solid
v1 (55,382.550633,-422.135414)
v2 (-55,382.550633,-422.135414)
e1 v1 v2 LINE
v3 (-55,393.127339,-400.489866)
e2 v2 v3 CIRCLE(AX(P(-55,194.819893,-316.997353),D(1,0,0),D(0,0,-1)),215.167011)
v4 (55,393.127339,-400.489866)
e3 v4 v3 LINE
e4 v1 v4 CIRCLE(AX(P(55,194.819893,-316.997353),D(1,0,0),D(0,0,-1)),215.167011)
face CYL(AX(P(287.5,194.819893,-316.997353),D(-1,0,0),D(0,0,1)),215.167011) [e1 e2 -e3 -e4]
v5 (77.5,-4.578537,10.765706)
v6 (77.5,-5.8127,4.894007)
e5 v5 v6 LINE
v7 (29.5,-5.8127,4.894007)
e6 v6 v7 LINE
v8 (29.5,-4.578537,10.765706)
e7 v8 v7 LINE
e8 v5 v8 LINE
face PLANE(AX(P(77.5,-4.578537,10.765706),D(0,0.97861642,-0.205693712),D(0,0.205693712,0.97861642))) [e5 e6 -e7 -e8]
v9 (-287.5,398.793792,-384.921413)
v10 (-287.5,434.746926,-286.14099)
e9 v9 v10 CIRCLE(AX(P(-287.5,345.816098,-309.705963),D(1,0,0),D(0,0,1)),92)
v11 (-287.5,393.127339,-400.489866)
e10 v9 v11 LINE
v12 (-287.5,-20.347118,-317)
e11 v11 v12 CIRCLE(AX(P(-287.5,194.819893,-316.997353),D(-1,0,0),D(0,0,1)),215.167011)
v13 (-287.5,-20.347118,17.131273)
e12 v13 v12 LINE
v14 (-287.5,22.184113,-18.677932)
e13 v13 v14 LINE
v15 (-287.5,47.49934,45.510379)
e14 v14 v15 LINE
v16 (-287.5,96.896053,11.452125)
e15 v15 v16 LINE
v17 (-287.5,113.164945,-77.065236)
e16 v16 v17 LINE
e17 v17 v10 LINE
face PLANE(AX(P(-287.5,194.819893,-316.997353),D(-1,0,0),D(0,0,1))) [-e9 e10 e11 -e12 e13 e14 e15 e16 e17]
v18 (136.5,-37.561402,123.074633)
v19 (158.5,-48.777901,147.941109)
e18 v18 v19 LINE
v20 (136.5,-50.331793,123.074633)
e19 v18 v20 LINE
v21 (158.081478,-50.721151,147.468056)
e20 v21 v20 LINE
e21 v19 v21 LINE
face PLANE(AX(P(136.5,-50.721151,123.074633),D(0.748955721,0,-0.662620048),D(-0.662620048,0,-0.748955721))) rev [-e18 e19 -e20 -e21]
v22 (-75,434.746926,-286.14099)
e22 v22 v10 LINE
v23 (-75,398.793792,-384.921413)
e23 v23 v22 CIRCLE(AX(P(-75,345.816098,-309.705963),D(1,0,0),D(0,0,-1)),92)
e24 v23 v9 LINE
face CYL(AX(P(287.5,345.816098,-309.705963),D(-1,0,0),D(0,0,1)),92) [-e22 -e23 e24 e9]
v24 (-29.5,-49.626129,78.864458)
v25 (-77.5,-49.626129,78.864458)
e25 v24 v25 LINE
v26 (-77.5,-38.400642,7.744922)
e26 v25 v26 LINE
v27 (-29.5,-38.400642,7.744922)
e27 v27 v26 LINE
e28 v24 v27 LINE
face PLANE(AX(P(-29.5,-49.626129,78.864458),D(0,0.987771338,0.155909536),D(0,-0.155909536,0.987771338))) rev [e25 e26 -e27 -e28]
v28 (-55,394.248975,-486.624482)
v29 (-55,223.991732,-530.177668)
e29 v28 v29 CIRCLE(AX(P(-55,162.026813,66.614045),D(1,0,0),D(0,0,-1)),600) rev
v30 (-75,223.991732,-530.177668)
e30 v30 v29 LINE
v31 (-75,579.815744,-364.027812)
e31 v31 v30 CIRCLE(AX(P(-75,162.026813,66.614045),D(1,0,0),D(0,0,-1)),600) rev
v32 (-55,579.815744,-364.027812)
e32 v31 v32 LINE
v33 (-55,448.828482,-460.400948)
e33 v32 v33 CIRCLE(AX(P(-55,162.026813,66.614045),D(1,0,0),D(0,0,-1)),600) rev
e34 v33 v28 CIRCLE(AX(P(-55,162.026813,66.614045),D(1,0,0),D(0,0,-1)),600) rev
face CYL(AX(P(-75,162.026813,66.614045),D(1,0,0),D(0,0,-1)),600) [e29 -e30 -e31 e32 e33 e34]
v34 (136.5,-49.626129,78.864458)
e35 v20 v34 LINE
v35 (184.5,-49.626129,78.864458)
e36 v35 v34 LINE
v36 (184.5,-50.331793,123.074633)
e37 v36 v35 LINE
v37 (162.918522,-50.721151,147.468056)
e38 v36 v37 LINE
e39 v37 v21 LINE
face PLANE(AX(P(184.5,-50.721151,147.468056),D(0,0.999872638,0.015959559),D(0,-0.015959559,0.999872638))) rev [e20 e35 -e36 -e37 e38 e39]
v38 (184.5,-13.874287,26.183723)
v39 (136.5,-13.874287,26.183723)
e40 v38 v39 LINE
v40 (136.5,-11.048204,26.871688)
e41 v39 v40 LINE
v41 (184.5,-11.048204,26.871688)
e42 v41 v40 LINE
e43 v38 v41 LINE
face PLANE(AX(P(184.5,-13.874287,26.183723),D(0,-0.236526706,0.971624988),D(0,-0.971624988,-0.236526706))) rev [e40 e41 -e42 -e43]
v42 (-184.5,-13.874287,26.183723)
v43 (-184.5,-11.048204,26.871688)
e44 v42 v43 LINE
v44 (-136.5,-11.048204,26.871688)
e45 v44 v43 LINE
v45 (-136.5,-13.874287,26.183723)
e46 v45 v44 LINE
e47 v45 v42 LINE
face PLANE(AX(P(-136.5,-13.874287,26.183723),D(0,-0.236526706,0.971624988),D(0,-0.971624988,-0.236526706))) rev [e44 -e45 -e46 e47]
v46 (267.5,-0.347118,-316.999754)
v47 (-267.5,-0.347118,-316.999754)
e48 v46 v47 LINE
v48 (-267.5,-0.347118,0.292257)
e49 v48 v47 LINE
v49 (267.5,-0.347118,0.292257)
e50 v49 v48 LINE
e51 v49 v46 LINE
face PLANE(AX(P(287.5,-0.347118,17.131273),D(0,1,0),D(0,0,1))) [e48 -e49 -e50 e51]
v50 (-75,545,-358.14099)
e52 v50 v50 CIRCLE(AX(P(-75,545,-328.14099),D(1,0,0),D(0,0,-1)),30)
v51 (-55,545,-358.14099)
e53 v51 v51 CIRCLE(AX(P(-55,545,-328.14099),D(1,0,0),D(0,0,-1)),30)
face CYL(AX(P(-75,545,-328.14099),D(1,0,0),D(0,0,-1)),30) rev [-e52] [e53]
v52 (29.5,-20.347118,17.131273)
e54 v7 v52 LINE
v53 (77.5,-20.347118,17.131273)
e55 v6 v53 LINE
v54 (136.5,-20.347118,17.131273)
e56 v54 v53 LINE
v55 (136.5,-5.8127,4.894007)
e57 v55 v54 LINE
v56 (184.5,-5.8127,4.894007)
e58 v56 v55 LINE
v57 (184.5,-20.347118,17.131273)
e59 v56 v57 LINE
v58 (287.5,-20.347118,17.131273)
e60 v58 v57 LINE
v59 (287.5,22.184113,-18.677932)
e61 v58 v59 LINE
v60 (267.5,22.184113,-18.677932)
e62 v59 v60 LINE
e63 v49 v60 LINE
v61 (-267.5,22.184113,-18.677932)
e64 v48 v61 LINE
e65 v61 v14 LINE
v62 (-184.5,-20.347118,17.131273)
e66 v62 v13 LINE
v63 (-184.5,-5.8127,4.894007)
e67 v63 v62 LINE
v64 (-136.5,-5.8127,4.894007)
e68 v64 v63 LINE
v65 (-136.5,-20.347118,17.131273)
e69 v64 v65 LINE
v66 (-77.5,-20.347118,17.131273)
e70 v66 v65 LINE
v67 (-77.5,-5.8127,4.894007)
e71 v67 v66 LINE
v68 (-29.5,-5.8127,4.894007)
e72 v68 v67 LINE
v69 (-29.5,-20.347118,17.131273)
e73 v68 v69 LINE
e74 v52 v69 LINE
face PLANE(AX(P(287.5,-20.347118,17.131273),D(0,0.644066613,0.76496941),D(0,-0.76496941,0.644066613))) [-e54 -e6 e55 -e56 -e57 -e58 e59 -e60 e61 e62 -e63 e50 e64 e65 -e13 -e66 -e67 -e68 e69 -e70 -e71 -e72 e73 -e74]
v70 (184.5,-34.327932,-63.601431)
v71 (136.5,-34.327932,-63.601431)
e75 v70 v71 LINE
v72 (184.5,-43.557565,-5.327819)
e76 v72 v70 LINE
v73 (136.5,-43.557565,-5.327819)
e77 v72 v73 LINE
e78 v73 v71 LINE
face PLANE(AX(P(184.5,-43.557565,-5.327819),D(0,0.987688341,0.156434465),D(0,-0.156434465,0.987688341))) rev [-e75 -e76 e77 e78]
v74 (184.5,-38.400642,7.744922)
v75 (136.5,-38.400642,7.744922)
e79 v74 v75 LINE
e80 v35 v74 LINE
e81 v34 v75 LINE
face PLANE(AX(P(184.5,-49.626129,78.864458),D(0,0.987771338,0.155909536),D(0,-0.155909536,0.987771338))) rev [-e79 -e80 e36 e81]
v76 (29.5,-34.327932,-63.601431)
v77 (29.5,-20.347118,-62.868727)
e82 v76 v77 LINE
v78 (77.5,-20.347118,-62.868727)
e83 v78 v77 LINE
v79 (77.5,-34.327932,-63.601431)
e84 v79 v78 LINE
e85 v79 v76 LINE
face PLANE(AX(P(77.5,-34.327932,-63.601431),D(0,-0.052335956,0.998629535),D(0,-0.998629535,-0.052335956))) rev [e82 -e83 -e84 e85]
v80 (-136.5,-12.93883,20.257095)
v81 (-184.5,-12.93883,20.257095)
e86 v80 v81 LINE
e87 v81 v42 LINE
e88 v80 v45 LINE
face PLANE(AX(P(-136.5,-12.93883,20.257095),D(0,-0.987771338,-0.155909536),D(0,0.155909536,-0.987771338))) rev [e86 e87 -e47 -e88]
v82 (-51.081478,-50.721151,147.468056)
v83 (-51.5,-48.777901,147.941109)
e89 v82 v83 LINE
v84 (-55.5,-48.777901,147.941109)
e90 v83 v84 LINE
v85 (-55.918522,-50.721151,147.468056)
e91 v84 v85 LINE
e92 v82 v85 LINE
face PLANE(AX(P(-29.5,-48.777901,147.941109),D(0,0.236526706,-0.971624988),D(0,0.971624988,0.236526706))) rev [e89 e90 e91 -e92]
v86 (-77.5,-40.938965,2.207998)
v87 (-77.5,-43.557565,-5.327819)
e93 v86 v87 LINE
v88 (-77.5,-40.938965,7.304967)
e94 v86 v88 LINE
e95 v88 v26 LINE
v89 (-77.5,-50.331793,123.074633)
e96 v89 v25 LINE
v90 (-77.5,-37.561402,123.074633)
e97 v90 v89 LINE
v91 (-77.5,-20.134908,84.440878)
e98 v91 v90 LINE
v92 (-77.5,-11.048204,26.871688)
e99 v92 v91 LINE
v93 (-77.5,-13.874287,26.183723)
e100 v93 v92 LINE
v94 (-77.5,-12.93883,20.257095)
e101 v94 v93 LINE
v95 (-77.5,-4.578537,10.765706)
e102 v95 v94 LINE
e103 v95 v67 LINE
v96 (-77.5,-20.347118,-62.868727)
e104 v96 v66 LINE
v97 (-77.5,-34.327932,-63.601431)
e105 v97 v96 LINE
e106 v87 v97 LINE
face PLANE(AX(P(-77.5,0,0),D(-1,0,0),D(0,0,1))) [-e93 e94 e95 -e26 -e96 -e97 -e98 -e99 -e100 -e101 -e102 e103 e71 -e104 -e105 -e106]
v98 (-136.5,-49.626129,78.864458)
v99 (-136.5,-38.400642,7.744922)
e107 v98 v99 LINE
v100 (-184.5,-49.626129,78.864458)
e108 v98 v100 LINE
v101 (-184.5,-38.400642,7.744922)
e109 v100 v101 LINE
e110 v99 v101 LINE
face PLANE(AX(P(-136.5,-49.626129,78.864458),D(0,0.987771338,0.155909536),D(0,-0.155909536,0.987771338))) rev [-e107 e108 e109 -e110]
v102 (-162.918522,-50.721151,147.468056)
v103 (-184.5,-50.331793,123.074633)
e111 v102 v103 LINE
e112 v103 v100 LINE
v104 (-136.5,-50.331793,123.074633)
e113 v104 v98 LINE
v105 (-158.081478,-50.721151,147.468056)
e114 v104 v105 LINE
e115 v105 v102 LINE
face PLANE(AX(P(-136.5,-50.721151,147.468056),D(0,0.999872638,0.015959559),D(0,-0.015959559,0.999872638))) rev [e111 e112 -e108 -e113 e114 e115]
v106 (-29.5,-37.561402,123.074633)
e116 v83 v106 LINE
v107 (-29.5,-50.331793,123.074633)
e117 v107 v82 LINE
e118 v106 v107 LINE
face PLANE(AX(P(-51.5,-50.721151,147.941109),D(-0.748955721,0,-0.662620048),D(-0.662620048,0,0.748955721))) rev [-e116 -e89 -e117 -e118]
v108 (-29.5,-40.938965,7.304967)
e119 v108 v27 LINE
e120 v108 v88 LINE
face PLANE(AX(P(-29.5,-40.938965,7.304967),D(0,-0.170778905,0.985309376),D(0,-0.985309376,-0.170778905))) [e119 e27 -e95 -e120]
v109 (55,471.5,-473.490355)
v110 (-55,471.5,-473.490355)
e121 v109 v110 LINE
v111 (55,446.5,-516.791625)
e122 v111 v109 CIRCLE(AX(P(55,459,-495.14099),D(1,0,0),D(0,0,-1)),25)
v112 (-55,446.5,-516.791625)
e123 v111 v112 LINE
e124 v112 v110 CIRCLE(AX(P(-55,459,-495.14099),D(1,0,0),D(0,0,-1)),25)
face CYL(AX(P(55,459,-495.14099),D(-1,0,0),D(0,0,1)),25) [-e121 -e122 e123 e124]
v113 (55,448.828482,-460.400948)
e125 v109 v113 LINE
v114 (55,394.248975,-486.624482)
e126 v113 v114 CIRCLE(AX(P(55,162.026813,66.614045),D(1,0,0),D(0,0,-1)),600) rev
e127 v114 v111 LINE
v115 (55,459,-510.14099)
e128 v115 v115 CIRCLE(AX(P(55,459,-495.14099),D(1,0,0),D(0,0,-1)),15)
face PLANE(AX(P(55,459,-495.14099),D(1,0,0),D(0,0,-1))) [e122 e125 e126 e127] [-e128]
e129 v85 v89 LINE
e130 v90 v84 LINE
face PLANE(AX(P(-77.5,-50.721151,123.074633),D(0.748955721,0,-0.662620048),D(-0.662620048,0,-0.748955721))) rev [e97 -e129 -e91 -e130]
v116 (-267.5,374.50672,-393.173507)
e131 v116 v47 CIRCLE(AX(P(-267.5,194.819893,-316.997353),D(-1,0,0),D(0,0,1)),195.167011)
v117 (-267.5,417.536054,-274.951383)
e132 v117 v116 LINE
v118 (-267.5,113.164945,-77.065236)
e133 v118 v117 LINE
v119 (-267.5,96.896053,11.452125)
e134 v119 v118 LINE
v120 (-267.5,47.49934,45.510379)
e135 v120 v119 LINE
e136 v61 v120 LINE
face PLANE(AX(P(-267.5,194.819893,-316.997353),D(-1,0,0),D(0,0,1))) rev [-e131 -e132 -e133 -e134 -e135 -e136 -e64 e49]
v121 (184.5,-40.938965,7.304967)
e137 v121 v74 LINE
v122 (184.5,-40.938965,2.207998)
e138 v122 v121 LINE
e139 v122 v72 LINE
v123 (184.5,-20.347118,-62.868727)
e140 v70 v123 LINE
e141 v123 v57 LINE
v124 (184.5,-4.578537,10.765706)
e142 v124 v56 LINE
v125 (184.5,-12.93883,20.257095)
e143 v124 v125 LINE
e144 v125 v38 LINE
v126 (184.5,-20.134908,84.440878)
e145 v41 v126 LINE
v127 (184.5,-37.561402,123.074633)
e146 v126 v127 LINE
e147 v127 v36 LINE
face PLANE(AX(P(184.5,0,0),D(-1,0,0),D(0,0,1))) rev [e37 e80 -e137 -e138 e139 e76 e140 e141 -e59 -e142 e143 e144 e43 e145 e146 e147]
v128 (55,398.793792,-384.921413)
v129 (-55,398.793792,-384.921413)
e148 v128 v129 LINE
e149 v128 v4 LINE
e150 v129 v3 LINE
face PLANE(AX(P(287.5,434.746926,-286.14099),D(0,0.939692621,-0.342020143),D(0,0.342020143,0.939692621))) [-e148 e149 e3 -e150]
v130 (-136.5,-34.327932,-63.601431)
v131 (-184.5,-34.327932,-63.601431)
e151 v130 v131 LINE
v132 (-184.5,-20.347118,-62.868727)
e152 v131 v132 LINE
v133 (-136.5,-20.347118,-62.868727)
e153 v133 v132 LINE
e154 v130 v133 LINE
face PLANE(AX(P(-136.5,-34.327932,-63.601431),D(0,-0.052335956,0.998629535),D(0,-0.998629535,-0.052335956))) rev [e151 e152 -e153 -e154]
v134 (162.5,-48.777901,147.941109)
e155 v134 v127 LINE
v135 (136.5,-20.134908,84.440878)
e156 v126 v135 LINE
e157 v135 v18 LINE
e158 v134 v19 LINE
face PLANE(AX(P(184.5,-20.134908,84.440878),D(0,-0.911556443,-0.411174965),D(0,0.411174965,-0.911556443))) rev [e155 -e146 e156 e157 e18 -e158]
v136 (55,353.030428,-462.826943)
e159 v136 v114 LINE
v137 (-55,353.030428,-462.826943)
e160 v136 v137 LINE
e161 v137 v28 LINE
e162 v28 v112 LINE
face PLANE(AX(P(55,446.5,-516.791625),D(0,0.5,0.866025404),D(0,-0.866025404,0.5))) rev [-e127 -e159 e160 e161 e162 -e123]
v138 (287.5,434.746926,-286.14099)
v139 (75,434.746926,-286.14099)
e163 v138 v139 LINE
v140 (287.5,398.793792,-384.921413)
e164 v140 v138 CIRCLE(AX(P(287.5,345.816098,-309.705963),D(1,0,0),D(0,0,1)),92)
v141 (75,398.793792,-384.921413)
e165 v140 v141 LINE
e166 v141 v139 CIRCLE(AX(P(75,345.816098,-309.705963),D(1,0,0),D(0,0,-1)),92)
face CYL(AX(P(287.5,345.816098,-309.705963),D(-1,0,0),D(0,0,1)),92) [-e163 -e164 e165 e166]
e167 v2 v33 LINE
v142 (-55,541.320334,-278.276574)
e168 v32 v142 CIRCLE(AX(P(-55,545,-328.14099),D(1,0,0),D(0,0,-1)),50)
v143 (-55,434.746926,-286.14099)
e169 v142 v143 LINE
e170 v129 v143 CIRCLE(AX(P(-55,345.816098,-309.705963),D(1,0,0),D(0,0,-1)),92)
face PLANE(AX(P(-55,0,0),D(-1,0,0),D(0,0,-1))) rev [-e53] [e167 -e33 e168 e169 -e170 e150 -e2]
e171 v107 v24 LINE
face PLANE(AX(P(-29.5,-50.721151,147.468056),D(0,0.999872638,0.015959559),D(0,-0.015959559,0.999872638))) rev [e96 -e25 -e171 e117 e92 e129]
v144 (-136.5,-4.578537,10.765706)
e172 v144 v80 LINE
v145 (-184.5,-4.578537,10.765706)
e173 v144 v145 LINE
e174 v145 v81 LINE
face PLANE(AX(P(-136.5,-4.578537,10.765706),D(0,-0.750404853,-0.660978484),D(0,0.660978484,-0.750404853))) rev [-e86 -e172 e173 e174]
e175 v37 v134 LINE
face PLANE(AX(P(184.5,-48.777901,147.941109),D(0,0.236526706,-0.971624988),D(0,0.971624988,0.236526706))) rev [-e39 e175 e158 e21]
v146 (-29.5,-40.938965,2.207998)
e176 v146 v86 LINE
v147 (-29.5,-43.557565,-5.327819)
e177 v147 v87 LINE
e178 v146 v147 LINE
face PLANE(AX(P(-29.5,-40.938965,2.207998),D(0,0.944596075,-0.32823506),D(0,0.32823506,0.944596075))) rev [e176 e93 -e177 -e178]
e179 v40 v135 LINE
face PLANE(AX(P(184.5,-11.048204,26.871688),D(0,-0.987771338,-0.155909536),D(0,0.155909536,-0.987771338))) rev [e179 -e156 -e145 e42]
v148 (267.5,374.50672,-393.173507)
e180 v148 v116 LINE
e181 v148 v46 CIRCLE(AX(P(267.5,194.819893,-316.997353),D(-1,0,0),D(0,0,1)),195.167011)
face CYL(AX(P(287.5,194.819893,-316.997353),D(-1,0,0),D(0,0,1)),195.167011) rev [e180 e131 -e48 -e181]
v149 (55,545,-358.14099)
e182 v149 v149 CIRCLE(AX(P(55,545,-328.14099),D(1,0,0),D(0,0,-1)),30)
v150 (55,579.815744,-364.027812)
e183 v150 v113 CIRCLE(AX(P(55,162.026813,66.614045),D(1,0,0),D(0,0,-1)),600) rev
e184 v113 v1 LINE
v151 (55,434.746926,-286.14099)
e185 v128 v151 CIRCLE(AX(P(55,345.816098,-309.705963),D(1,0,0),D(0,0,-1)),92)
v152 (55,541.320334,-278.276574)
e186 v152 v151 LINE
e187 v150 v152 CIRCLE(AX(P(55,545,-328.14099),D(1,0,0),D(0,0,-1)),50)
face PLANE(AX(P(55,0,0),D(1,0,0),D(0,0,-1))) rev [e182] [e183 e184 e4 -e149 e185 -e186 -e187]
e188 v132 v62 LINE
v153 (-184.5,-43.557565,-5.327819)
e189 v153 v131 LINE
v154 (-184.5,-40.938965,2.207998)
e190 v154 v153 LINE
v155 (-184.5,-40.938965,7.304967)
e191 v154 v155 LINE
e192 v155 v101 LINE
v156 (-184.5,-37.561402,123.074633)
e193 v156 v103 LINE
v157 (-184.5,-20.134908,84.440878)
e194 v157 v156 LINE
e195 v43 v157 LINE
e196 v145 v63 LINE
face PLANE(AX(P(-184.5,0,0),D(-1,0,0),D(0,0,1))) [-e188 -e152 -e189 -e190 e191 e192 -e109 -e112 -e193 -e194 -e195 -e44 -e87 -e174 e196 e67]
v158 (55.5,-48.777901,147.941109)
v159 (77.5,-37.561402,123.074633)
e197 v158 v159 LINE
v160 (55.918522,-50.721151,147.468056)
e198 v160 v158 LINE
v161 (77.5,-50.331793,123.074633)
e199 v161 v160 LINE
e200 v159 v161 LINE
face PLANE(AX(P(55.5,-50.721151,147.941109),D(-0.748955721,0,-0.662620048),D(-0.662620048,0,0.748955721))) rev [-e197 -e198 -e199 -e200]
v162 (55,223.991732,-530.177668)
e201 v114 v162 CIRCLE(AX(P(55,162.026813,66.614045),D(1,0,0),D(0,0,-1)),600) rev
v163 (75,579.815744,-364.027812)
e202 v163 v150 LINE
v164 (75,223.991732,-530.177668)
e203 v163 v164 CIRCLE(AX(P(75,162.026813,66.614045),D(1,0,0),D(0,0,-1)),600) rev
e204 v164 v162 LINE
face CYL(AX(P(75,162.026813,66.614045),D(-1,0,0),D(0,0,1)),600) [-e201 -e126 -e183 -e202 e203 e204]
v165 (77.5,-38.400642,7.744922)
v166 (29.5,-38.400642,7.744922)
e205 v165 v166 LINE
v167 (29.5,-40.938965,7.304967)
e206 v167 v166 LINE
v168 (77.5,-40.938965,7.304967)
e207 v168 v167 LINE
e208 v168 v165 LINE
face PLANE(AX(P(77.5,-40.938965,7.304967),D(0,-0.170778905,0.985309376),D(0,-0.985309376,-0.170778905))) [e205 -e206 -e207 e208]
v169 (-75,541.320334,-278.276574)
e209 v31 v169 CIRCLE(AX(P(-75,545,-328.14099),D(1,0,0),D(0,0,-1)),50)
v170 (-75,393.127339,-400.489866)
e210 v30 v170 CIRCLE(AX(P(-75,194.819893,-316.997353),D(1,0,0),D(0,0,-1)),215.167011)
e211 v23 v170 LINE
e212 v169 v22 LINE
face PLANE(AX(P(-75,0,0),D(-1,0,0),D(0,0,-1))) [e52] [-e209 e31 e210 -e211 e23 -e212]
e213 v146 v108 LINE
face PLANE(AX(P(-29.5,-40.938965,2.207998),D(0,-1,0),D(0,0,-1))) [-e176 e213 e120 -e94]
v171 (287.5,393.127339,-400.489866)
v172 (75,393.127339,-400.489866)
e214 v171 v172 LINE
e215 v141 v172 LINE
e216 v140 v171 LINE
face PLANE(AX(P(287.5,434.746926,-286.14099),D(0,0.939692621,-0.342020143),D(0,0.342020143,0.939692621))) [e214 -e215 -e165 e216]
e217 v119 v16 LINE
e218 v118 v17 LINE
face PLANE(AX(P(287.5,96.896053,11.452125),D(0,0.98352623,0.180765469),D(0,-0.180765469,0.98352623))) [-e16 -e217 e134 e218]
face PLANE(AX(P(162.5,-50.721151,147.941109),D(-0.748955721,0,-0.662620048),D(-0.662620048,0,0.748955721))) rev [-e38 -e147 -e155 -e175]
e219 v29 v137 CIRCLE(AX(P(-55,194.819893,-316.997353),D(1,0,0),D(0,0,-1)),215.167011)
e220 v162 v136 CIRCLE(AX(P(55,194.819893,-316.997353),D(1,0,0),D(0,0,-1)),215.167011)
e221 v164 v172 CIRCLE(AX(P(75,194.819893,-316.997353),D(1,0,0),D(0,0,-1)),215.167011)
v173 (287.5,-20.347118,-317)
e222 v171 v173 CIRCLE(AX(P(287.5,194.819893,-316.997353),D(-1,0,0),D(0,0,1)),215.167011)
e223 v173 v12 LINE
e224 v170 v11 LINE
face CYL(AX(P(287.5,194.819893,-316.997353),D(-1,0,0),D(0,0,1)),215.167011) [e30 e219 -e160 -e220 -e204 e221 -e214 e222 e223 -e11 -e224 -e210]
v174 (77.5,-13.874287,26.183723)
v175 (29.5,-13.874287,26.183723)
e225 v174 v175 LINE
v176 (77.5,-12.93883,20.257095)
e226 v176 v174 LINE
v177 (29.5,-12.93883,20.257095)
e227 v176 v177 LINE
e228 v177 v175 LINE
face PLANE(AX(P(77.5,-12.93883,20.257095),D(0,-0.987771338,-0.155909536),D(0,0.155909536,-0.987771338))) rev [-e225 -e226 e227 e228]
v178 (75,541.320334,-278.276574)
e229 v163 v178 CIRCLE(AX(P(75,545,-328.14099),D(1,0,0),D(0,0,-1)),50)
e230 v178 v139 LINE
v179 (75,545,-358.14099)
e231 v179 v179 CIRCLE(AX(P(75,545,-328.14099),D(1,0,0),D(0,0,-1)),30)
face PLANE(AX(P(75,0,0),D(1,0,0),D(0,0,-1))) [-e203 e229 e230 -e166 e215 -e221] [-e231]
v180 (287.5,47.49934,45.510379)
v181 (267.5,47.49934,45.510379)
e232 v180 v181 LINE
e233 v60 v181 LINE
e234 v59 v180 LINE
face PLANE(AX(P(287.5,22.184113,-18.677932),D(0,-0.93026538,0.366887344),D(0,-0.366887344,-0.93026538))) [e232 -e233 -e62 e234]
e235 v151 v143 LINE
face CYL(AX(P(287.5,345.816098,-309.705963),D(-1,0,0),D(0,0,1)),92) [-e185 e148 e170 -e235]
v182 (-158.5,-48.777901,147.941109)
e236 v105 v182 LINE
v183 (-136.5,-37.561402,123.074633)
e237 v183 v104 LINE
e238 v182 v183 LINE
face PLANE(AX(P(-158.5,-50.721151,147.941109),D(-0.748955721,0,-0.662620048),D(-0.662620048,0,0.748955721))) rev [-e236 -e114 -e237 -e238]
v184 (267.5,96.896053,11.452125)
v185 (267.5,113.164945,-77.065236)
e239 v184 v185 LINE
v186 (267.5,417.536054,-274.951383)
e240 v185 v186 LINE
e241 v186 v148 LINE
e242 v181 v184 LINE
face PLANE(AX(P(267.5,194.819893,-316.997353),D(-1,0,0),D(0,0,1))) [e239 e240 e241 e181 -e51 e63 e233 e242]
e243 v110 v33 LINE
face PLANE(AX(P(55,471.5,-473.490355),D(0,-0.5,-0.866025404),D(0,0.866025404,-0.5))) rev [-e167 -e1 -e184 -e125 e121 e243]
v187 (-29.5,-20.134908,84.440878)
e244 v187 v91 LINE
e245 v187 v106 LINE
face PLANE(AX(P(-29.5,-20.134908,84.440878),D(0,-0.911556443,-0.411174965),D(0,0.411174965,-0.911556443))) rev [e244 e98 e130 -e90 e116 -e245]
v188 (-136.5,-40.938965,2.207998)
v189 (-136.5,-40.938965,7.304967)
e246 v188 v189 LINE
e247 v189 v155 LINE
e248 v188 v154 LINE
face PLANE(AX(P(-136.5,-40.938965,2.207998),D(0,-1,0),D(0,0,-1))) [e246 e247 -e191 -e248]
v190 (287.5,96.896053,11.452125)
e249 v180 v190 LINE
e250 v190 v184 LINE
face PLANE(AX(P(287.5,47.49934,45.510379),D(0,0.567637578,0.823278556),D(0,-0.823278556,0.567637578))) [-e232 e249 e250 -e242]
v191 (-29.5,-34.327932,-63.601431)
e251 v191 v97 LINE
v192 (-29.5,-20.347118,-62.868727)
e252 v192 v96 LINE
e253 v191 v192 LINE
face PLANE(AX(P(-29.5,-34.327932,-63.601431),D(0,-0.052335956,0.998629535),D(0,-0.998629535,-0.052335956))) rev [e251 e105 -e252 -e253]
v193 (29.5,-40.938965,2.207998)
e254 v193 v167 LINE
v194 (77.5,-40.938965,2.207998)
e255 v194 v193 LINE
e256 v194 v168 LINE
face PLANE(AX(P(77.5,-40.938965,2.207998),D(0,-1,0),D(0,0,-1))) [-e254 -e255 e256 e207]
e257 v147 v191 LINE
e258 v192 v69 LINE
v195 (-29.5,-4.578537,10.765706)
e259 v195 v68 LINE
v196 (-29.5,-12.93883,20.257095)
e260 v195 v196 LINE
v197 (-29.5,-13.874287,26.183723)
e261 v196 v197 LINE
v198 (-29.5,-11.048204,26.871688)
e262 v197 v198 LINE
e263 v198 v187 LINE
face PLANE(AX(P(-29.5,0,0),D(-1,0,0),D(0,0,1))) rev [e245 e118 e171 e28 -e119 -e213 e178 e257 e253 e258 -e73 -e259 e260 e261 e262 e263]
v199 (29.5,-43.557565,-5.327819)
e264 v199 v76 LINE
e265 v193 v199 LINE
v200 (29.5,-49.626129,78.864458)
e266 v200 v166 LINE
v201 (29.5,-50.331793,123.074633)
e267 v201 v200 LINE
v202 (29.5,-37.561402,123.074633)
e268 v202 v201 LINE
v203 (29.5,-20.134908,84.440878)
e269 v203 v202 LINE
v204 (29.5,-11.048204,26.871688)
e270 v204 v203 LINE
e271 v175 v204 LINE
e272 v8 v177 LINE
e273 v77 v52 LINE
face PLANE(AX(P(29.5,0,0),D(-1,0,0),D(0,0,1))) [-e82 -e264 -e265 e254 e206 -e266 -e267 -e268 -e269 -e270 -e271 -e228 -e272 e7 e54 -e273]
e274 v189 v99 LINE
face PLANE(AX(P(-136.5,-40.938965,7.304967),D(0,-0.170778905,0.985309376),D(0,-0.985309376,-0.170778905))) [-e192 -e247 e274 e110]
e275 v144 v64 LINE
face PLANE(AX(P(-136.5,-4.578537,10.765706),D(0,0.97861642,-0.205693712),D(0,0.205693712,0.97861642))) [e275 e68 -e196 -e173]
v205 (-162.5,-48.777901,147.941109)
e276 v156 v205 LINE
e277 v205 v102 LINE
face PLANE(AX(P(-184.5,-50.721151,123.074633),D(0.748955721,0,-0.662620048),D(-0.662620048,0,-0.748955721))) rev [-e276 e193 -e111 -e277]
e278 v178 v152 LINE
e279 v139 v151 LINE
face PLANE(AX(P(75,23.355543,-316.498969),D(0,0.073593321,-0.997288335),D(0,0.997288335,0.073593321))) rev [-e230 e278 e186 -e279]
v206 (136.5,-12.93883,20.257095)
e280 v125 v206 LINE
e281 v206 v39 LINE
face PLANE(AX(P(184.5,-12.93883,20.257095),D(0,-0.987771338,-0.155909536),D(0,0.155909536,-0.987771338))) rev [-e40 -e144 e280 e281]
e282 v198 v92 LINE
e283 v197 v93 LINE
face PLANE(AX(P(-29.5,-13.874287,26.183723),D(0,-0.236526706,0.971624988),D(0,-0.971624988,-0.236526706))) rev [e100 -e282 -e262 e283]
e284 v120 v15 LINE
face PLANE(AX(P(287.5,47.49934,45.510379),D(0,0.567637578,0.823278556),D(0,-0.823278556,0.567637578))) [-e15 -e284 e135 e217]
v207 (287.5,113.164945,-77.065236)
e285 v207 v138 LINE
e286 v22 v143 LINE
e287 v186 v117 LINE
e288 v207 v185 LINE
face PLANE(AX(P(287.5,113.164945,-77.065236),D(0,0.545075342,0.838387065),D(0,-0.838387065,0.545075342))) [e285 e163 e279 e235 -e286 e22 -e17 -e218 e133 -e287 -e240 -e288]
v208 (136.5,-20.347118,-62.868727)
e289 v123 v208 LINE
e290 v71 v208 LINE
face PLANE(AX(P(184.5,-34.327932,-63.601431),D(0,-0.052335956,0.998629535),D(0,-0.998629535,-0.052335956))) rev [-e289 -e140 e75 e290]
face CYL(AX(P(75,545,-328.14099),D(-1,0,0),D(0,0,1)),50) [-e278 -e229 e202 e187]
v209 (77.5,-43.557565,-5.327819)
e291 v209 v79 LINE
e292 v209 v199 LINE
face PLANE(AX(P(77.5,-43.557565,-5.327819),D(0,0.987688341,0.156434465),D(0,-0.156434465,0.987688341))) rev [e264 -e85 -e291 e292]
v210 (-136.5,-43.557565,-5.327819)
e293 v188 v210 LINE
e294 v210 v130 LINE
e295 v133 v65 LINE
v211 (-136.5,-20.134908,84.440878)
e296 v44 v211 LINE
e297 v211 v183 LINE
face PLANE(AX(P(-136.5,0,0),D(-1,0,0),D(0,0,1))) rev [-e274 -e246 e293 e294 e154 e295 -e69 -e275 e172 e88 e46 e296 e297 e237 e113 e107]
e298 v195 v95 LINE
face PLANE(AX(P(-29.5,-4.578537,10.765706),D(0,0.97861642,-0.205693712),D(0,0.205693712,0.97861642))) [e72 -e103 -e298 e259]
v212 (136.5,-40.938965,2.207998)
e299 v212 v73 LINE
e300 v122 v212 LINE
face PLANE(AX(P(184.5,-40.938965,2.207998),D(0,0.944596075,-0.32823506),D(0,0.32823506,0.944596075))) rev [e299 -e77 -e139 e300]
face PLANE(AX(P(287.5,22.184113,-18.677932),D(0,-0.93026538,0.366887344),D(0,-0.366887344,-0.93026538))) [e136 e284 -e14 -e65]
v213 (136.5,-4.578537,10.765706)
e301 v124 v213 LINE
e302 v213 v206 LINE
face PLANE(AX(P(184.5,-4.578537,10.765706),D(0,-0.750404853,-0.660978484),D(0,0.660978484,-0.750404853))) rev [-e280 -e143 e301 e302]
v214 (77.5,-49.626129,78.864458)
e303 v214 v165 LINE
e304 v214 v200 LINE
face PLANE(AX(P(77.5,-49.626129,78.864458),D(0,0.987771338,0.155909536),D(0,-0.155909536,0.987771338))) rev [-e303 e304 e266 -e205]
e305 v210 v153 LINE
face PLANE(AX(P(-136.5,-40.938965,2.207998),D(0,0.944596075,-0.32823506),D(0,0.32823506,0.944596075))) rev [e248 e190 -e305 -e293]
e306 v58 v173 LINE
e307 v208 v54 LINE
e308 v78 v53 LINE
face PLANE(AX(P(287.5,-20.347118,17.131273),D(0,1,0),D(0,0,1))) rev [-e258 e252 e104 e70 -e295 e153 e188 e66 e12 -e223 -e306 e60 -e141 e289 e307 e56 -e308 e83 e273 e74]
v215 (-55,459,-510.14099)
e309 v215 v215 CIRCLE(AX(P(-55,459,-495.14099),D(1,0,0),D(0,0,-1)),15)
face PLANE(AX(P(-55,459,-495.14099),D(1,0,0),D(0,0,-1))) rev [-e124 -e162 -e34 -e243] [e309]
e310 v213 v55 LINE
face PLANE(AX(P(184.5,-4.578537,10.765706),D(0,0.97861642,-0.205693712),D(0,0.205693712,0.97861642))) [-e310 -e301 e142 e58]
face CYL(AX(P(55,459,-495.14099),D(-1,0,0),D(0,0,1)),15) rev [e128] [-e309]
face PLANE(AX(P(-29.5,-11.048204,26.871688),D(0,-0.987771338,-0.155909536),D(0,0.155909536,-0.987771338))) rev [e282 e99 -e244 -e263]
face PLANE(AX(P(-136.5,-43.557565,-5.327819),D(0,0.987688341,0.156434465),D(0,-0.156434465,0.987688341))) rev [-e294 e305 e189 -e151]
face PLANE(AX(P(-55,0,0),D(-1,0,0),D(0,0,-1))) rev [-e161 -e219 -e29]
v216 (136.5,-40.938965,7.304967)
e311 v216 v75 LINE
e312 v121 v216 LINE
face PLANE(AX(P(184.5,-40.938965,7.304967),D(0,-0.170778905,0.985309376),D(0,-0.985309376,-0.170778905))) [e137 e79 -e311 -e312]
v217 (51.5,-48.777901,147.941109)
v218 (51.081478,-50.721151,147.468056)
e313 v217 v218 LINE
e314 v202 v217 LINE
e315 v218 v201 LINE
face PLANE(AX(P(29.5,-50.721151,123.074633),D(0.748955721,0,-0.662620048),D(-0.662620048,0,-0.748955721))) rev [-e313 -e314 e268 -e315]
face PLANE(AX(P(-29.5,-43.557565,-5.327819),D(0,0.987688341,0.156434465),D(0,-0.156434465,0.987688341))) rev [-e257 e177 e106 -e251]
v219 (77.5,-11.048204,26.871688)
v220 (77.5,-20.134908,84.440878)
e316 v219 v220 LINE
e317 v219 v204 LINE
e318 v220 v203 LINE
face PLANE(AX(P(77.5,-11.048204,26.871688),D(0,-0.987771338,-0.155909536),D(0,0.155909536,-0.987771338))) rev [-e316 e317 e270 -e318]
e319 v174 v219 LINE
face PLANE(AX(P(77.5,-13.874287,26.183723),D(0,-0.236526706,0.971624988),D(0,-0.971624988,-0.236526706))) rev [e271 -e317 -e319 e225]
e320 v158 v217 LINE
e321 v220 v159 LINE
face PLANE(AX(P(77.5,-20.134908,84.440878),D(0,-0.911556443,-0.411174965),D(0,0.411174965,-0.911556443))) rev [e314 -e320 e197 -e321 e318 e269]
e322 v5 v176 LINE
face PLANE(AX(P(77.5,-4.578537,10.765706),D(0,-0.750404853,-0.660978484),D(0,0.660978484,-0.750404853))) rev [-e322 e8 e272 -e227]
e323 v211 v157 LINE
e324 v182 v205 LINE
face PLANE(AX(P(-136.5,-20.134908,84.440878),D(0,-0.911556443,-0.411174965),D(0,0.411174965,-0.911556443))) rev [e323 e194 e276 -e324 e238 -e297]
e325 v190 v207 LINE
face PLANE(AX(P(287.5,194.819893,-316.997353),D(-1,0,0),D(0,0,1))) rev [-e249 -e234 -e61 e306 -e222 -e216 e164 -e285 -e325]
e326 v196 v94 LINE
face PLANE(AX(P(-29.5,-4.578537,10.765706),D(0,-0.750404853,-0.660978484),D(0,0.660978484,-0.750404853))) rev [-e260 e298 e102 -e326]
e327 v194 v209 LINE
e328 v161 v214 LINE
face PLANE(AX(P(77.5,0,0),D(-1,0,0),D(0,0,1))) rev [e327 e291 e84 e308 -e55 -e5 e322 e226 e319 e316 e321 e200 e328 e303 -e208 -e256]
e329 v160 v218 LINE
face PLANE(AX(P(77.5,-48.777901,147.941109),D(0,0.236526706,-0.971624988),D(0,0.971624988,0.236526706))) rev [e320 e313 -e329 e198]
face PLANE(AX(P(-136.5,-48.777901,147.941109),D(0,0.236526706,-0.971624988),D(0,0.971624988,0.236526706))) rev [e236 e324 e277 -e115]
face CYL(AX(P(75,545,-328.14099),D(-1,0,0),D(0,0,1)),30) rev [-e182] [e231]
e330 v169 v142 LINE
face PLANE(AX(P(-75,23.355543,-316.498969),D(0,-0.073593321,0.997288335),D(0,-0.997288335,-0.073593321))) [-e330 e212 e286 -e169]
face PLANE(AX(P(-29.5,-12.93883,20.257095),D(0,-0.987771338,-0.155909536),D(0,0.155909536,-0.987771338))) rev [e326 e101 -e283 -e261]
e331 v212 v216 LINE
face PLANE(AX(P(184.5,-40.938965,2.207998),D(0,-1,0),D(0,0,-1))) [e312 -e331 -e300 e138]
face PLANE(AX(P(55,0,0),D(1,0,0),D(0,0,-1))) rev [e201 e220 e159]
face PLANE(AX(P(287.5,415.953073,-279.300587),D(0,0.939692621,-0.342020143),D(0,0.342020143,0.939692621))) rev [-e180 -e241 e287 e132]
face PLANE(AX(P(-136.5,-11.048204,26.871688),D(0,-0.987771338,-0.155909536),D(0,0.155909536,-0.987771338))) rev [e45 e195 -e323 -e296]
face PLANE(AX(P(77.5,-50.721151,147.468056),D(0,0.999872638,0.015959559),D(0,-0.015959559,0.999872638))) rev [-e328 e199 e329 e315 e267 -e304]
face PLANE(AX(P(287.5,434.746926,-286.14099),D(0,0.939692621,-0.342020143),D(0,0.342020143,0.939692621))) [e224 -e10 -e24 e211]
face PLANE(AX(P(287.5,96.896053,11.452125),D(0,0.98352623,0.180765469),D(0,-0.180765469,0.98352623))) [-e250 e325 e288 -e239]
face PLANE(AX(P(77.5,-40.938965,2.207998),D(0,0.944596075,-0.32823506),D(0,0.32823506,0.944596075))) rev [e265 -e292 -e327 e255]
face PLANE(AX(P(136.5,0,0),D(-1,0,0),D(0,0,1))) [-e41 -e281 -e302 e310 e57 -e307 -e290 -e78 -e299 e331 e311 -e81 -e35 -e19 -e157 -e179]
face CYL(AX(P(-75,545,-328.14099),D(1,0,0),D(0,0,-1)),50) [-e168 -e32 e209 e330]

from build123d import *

# Parameters (mm, degrees)
BOSS_EXTRUDE2_DEPTH = 287.5
SHELL1_START        = -267.5
SHELL1_DEPTH        = 535
SKETCH4_R           = 15
BOSS_EXTRUDE3_DEPTH = 55
BOSS_EXTRUDE4_DEPTH = 287.5
BOSS_EXTRUDE5_START = 75
SKETCH6_R           = 30
BOSS_EXTRUDE5_DEPTH = 20
BOSS_EXTRUDE6_DEPTH = 48
CUT_EXTRUDE1_DEPTH  = 849.457518617
LPATTERN1_COUNT     = 4
LPATTERN1_PITCH     = 107


# Read off the part's stored shape, not the designer's step: Shell1
with BuildPart() as part:
    # Sketch1 → Boss-Extrude2 (new, symmetric)
    with BuildSketch(Plane(origin=(0, 0, 0), x_dir=(0, 0, -1), z_dir=(1, 0, 0))):
        with BuildLine():
            Line((-17.131272745, -20.34711833), (18.677931789, 22.184112876))
            Line((18.677931789, 22.184112876), (-45.510379426, 47.499339584))
            Line((-45.510379426, 47.499339584), (-11.452124758, 96.896052925))
            Line((-11.452124758, 96.896052925), (77.065235948, 113.164945136))
            Line((77.065235948, 113.164945136), (286.140990264, 434.746925642))
            Line((286.140990264, 434.746925642), (400.489865708, 393.127338659))
            ThreePointArc((400.489865708, 393.127338659), (527.907623498, 152.23232826), (317, -20.34711833))
            Line((317, -20.34711833), (-17.131272745, -20.34711833))
        make_face()
    extrude(amount=BOSS_EXTRUDE2_DEPTH, both=True)

    # Shell1 outline → Shell1 (cut)
    with BuildSketch(Plane.YZ.offset(SHELL1_START)):
        with BuildLine():
            Line((-0.34711833, 0.292256559), (-0.347118332, -316.999753995))
            ThreePointArc((-0.347118332, -316.999753995), (155.954494492, -508.255406969), (374.506719993, -393.173507026))
            Line((374.506719993, -393.173507026), (417.536054052, -274.951383325))
            Line((417.536054052, -274.951383325), (113.164945136, -77.065235948))
            Line((113.164945136, -77.065235948), (96.896052925, 11.452124758))
            Line((96.896052925, 11.452124758), (47.499339584, 45.510379426))
            Line((47.499339584, 45.510379426), (22.184112876, -18.677931789))
            Line((22.184112876, -18.677931789), (-0.34711833, 0.292256559))
        make_face()
    extrude(amount=SHELL1_DEPTH, mode=Mode.SUBTRACT)

    # Sketch4 → Boss-Extrude3 (add, symmetric)
    with BuildSketch(Plane(origin=(0, 0, 0), x_dir=(0, 0, -1), z_dir=(1, 0, 0))):
        with BuildLine():
            Line((473.490355169, 471.5), (422.135414248, 382.550633104))
            ThreePointArc((422.135414248, 382.550633104), (443.346279027, 368.983010842), (462.826942921, 353.030428204))
            Line((462.826942921, 353.030428204), (516.791625358, 446.5))
            ThreePointArc((516.791625358, 446.5), (507.640990264, 480.650635095), (473.490355169, 471.5))
        make_face()
        with Locations((495.140990264, 459)):
            Circle(SKETCH4_R, mode=Mode.SUBTRACT)
    extrude(amount=BOSS_EXTRUDE3_DEPTH, both=True)

    # Sketch5 → Boss-Extrude4 (add, symmetric)
    with BuildSketch(Plane(origin=(0, 0, 0), x_dir=(0, 0, -1), z_dir=(1, 0, 0))):
        with BuildLine():
            Line((286.140990264, 434.746925642), (384.921412729, 398.793792137))
            ThreePointArc((384.921412729, 398.793792137), (341.171815777, 432.267819258), (286.140990264, 434.746925642))
        make_face()
    extrude(amount=BOSS_EXTRUDE4_DEPTH, both=True)

    # Sketch6 → Boss-Extrude5 (add)
    with BuildSketch(Plane(origin=(0, 0, 0), x_dir=(0, 0, -1), z_dir=(1, 0, 0)).offset(BOSS_EXTRUDE5_START)):
        with BuildLine():
            ThreePointArc((364.02781167, 579.815744274), (307.663748085, 590.61449937), (278.276573516, 541.320333932))
            Line((278.276573516, 541.320333932), (286.140990264, 434.746925642))
            ThreePointArc((286.140990264, 434.746925642), (341.171815777, 432.267819258), (384.921412729, 398.793792137))
            Line((384.921412729, 398.793792137), (400.489865708, 393.127338659))
            ThreePointArc((400.489865708, 393.127338659), (487.746891868, 325.745206641), (530.177667873, 223.99173212))
            ThreePointArc((530.177667873, 223.99173212), (477.038065131, 415.881856126), (364.02781167, 579.815744274))
        make_face()
        with Locations((328.140990264, 545)):
            Circle(SKETCH6_R, mode=Mode.SUBTRACT)
    boss_extrude5 = extrude(amount=-BOSS_EXTRUDE5_DEPTH)

    # Mirror1: Boss-Extrude5 across plane
    add(boss_extrude5.mirror(Plane(origin=(0, 0, 0), x_dir=(0, 0, 1), z_dir=(1, 0, 0))))

    # Sketch9 → Boss-Extrude6 (add)
    with BuildSketch(Plane(origin=(-184.5, 0, 0), x_dir=(0, 0, -1), z_dir=(1, 0, 0))):
        Polygon((-2.207998194, -40.938965281), (-7.30496659, -40.938965281), (-7.744921849, -38.400642166), (-78.864458205, -49.626128726), (-147.468055977, -50.72115136), (-147.941109389, -48.777901384), (-84.440877624, -20.13490752), (-26.871687982, -11.048203673), (-26.183722798, -13.874286929), (-20.257094768, -12.938829716), (-10.765705608, -4.578537278), (-4.89400709, -5.81269955), (-17.131272745, -20.34711833), (62.868727255, -20.34711833), (63.601430642, -34.327931817), (5.327818547, -43.557565254), align=None)
    boss_extrude6 = extrude(amount=BOSS_EXTRUDE6_DEPTH)

    # Sketch10 → Cut-Extrude1 (cut, symmetric)
    with BuildSketch(Plane(origin=(0, 0, 0), x_dir=(1, 0, 0), z_dir=(0, 1, 0))):
        Polygon((-184.5, -123.07463289), (-162.5, -147.941109389), (-184.5, -147.941109389), align=None)
        Polygon((-158.5, -147.941109389), (-136.5, -123.07463289), (-136.5, -147.941109389), align=None)
    cut_extrude1 = extrude(amount=CUT_EXTRUDE1_DEPTH, both=True, mode=Mode.SUBTRACT)

    # LPattern1: Boss-Extrude6, Cut-Extrude1 ×4
    with Locations(*[(i * LPATTERN1_PITCH, 0, 0) for i in range(1, LPATTERN1_COUNT)]):
        add(boss_extrude6)
        add(cut_extrude1, mode=Mode.SUBTRACT)


solid = part.part
